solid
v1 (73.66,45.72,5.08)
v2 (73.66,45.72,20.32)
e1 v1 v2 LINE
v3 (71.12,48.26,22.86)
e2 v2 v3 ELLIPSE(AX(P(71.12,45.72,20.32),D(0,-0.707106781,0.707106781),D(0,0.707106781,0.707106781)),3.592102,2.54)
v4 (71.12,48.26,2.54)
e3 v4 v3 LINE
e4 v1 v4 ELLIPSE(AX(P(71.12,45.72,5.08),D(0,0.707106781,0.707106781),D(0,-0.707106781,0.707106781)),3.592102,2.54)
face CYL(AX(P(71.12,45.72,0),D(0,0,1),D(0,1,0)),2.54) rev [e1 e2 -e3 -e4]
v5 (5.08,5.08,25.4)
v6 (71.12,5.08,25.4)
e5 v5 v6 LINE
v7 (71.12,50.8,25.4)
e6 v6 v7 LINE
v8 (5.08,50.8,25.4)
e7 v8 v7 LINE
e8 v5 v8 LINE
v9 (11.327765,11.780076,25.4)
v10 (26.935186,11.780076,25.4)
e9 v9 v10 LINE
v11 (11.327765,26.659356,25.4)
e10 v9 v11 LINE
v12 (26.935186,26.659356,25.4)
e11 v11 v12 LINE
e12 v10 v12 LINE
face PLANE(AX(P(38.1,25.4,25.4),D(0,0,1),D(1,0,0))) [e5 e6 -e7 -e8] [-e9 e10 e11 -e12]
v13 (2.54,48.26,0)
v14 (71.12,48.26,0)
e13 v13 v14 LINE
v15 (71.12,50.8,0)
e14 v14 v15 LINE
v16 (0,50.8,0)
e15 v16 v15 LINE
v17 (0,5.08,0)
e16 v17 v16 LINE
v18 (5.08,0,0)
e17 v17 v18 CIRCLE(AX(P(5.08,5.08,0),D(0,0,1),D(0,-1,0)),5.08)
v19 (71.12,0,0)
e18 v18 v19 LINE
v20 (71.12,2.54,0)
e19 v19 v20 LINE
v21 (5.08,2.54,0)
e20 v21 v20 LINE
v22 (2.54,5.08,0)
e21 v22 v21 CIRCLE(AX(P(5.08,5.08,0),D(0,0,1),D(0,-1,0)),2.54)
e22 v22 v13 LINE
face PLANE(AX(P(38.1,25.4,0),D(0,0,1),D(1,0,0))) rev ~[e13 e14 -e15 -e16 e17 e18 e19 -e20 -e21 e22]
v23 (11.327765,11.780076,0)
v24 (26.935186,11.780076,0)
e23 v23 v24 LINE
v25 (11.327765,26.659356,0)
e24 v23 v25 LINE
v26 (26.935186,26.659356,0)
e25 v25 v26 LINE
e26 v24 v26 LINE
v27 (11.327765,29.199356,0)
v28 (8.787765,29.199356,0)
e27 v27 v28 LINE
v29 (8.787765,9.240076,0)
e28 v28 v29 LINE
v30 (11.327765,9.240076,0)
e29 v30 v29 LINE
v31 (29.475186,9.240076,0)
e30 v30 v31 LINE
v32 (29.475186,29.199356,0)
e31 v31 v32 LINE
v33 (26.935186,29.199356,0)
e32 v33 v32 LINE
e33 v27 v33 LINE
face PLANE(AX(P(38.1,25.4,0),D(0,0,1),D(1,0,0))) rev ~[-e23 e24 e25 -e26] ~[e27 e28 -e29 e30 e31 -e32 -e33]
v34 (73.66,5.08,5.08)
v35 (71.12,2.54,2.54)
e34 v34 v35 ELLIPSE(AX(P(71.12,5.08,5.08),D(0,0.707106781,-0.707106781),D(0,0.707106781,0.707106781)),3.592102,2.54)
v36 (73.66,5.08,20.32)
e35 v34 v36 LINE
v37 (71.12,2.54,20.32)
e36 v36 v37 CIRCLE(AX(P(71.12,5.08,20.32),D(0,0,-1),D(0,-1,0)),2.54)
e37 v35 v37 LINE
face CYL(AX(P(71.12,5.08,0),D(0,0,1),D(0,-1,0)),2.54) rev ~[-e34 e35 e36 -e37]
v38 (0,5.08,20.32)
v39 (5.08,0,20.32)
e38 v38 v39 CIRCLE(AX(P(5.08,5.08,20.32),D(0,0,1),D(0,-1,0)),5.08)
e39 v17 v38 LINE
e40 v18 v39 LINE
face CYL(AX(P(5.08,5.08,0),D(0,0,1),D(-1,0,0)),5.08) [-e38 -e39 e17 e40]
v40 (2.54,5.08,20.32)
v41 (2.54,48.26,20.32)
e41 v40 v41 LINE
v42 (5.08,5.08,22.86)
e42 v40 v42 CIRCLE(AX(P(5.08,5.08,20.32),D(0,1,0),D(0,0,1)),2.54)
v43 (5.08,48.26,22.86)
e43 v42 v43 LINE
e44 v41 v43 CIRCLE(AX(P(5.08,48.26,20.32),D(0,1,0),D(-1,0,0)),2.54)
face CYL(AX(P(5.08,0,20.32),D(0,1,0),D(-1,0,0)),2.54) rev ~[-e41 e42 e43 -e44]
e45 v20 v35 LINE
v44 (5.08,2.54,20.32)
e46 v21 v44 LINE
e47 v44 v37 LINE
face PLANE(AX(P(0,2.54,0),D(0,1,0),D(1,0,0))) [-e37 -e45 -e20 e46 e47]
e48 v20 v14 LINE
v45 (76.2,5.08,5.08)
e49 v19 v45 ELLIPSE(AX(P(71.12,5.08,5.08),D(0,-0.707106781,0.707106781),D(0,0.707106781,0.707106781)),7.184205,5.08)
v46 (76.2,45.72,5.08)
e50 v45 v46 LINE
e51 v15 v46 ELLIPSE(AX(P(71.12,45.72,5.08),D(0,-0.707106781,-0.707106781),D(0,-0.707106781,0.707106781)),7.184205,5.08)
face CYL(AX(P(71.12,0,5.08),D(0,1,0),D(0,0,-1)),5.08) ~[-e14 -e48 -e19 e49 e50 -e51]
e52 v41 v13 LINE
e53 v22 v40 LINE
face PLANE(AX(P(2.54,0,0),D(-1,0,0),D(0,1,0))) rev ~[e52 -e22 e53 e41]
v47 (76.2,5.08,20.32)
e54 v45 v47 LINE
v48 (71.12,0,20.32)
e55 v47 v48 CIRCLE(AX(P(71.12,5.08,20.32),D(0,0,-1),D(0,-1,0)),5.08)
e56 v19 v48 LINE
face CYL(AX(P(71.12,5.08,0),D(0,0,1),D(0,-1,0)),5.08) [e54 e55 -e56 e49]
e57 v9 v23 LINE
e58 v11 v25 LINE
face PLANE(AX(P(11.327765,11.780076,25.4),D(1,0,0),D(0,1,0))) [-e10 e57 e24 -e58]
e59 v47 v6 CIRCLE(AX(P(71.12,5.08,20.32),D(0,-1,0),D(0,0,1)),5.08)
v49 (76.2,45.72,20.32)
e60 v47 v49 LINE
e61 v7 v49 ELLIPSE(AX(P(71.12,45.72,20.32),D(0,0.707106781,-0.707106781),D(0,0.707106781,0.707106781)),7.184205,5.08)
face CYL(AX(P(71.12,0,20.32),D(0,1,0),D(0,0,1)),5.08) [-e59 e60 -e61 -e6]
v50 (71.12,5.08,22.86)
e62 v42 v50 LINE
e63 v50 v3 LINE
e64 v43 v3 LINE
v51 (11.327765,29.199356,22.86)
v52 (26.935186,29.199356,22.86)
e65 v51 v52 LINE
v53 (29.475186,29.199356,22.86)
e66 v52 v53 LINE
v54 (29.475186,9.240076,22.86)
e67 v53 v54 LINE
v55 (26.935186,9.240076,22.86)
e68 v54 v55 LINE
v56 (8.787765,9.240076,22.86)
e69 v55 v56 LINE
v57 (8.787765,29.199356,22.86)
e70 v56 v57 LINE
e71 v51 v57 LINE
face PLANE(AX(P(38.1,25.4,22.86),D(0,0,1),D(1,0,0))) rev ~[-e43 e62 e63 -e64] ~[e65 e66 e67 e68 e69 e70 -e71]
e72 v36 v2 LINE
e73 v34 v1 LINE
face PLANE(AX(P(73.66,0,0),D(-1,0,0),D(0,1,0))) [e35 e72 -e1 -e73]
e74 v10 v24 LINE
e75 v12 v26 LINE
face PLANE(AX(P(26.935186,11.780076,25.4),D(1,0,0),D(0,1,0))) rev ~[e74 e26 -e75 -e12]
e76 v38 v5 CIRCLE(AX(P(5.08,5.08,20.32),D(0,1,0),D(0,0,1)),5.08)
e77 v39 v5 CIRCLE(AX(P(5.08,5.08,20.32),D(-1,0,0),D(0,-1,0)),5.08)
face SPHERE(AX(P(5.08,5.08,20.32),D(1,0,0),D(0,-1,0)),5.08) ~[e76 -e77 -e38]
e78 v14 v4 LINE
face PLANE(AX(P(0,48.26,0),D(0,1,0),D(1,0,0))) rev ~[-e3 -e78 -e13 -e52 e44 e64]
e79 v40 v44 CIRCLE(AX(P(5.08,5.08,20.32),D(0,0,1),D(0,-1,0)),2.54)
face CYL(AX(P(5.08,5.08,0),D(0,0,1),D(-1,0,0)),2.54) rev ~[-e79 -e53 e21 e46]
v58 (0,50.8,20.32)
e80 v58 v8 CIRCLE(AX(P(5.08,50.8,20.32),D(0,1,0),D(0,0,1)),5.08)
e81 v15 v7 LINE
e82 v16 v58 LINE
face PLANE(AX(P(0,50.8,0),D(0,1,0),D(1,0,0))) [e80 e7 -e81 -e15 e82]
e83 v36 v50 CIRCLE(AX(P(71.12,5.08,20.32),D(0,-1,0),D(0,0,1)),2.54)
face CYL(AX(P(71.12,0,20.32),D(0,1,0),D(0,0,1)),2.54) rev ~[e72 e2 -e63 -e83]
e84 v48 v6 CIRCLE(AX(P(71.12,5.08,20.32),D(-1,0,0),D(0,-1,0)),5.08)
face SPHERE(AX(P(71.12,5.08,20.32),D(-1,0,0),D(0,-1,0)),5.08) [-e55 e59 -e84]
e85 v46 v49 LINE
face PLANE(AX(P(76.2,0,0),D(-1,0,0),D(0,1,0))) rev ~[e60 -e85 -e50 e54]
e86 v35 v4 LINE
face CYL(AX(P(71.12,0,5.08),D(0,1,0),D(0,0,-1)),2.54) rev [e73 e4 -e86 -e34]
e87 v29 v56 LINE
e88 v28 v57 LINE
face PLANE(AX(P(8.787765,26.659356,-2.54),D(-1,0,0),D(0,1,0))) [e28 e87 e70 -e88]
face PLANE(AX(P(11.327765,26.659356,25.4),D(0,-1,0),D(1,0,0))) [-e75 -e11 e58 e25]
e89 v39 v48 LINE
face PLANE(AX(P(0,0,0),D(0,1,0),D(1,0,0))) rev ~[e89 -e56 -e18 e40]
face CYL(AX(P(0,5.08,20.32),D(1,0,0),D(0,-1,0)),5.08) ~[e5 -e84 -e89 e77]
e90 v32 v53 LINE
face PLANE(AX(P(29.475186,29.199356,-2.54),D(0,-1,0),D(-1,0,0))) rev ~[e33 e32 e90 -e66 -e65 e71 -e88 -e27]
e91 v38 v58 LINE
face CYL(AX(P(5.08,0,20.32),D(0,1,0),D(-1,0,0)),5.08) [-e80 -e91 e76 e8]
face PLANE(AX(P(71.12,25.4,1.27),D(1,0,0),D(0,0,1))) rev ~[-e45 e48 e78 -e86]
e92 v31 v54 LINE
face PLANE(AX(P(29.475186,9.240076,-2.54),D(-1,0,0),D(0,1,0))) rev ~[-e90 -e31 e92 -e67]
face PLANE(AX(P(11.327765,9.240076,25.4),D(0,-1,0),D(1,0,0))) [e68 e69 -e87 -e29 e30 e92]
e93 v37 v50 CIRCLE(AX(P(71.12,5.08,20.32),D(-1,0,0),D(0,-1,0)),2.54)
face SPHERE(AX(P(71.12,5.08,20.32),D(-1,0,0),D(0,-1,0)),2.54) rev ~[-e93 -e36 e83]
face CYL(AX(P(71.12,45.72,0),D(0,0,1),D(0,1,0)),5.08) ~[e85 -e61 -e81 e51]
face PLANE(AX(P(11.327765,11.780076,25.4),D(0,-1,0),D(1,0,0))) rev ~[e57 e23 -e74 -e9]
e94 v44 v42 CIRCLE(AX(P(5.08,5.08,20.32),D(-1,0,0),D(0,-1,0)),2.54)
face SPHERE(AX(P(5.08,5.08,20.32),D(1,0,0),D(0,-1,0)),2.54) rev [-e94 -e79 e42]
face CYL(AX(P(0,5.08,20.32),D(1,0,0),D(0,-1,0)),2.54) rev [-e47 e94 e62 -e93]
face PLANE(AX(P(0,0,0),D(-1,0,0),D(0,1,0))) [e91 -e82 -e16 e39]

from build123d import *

# Parameters (mm, degrees)
F0_W        = 76.2
F0_H        = 50.8
F1_DEPTH    = 25.4
F2_W        = 15.6074212864
F2_H        = 14.8792807013
F3_DEPTH    = 25.4
F4_R        = 5.08
F5_T        = 2.54
F5_T3_DEPTH = 30.48


# Not quite as in the source:
# - a shell that OpenCascade refuses in one call is made with other operations: the cavity is built on its own and cut out


with BuildPart() as f1:
    # F0 (on Top) → F1 (new body)
    with BuildSketch(Plane.XY):
        with Locations((38.1, 25.4)):
            Rectangle(F0_W, F0_H)
    extrude(amount=F1_DEPTH)

    # F2 (on face) → F3 (cut, through all)
    with BuildSketch(Plane.XY.offset(25.4)):
        with Locations((19.1314755939, 19.2197160795)):
            Rectangle(F2_W, F2_H)
    extrude(amount=-F3_DEPTH, mode=Mode.SUBTRACT)

    # F4
    f4_edges = [f1.edges().sort_by_distance(p)[0] for p in [
        (38.1, 0, 25.4),
        (76.2, 0, 12.7),
        (76.2, 50.8, 12.7),
        (76.2, 25.4, 0),
        (76.2, 25.4, 25.4),
        (0, 0, 12.7),
        (0, 25.4, 25.4),
    ]]
    fillet(f4_edges, radius=F4_R)

    # F5: shell of thickness 2.54, made by hand


with BuildPart() as f5_core1:
    # F5_t2: copy of F1
    add(f1.part)

    # the walls: a layer under each face that stays
    f5_faces = [f5_core1.faces().sort_by_distance(p)[0] for p in [
        (0, 27.94, 10.16),
        (35.56, 50.8, 12.7),
        (1.4878975516, 27.94, 23.9121024484),
        (1.4878975516, 1.4878975516, 10.16),
        (38.1, 27.94, 25.4),
        (74.7121026222, 49.3121022747, 12.7),
        (1.4878975516, 2.54, 22.86),
        (38.1, 0, 10.16),
        (74.7121025744, 25.4, 1.4878976776),
        (11.3277649507, 19.2197160795, 12.7),
        (19.1314755939, 11.7800757289, 12.7),
        (26.9351862371, 19.2197160795, 12.7),
        (19.1314755939, 26.6593564302, 12.7),
        (74.7121026222, 27.94, 23.9121022747),
        (38.1, 1.4878975516, 23.9121024484),
        (76.2, 25.4, 12.7),
        (74.7121024484, 1.4878975516, 10.16),
        (74.7121024484, 2.54, 22.86),
    ]]
    thicken(f5_faces, amount=-F5_T, mode=Mode.SUBTRACT)

    # F5_s4 → F5_t3 (cut)
    with BuildSketch(Plane.XY.offset(-2.54)):
        Polygon((11.3531649507, 26.6339564302), (8.7877649507, 26.6593564302), (8.7877649507, 29.1993564302), (11.3277649507, 29.1993564302), align=None)
        Polygon((11.3531649507, 11.8054757289), (8.7877649507, 11.7800757289), (8.7877649507, 9.2400757289), (11.3277649507, 9.2400757289), align=None)
        Polygon((26.9097862371, 11.8054757289), (26.9351862371, 9.2400757289), (29.4751862371, 9.2400757289), (29.4751862371, 11.7800757289), align=None)
        Polygon((26.9097862371, 26.6339564302), (29.4751862371, 26.6593564302), (29.4751862371, 29.1993564302), (26.9351862371, 29.1993564302), align=None)
    extrude(amount=F5_T3_DEPTH, mode=Mode.SUBTRACT)


with BuildPart() as f1_1:
    add(f1.part)

    # what is left inside the walls is the cavity
    f5_cavity = [f5_core1.part.solids().sort_by_distance(p)[0] for p in [
        (36.83, 17.78, 0.0254),
    ]]
    add(f5_cavity, mode=Mode.SUBTRACT)


solid = f1_1.part
